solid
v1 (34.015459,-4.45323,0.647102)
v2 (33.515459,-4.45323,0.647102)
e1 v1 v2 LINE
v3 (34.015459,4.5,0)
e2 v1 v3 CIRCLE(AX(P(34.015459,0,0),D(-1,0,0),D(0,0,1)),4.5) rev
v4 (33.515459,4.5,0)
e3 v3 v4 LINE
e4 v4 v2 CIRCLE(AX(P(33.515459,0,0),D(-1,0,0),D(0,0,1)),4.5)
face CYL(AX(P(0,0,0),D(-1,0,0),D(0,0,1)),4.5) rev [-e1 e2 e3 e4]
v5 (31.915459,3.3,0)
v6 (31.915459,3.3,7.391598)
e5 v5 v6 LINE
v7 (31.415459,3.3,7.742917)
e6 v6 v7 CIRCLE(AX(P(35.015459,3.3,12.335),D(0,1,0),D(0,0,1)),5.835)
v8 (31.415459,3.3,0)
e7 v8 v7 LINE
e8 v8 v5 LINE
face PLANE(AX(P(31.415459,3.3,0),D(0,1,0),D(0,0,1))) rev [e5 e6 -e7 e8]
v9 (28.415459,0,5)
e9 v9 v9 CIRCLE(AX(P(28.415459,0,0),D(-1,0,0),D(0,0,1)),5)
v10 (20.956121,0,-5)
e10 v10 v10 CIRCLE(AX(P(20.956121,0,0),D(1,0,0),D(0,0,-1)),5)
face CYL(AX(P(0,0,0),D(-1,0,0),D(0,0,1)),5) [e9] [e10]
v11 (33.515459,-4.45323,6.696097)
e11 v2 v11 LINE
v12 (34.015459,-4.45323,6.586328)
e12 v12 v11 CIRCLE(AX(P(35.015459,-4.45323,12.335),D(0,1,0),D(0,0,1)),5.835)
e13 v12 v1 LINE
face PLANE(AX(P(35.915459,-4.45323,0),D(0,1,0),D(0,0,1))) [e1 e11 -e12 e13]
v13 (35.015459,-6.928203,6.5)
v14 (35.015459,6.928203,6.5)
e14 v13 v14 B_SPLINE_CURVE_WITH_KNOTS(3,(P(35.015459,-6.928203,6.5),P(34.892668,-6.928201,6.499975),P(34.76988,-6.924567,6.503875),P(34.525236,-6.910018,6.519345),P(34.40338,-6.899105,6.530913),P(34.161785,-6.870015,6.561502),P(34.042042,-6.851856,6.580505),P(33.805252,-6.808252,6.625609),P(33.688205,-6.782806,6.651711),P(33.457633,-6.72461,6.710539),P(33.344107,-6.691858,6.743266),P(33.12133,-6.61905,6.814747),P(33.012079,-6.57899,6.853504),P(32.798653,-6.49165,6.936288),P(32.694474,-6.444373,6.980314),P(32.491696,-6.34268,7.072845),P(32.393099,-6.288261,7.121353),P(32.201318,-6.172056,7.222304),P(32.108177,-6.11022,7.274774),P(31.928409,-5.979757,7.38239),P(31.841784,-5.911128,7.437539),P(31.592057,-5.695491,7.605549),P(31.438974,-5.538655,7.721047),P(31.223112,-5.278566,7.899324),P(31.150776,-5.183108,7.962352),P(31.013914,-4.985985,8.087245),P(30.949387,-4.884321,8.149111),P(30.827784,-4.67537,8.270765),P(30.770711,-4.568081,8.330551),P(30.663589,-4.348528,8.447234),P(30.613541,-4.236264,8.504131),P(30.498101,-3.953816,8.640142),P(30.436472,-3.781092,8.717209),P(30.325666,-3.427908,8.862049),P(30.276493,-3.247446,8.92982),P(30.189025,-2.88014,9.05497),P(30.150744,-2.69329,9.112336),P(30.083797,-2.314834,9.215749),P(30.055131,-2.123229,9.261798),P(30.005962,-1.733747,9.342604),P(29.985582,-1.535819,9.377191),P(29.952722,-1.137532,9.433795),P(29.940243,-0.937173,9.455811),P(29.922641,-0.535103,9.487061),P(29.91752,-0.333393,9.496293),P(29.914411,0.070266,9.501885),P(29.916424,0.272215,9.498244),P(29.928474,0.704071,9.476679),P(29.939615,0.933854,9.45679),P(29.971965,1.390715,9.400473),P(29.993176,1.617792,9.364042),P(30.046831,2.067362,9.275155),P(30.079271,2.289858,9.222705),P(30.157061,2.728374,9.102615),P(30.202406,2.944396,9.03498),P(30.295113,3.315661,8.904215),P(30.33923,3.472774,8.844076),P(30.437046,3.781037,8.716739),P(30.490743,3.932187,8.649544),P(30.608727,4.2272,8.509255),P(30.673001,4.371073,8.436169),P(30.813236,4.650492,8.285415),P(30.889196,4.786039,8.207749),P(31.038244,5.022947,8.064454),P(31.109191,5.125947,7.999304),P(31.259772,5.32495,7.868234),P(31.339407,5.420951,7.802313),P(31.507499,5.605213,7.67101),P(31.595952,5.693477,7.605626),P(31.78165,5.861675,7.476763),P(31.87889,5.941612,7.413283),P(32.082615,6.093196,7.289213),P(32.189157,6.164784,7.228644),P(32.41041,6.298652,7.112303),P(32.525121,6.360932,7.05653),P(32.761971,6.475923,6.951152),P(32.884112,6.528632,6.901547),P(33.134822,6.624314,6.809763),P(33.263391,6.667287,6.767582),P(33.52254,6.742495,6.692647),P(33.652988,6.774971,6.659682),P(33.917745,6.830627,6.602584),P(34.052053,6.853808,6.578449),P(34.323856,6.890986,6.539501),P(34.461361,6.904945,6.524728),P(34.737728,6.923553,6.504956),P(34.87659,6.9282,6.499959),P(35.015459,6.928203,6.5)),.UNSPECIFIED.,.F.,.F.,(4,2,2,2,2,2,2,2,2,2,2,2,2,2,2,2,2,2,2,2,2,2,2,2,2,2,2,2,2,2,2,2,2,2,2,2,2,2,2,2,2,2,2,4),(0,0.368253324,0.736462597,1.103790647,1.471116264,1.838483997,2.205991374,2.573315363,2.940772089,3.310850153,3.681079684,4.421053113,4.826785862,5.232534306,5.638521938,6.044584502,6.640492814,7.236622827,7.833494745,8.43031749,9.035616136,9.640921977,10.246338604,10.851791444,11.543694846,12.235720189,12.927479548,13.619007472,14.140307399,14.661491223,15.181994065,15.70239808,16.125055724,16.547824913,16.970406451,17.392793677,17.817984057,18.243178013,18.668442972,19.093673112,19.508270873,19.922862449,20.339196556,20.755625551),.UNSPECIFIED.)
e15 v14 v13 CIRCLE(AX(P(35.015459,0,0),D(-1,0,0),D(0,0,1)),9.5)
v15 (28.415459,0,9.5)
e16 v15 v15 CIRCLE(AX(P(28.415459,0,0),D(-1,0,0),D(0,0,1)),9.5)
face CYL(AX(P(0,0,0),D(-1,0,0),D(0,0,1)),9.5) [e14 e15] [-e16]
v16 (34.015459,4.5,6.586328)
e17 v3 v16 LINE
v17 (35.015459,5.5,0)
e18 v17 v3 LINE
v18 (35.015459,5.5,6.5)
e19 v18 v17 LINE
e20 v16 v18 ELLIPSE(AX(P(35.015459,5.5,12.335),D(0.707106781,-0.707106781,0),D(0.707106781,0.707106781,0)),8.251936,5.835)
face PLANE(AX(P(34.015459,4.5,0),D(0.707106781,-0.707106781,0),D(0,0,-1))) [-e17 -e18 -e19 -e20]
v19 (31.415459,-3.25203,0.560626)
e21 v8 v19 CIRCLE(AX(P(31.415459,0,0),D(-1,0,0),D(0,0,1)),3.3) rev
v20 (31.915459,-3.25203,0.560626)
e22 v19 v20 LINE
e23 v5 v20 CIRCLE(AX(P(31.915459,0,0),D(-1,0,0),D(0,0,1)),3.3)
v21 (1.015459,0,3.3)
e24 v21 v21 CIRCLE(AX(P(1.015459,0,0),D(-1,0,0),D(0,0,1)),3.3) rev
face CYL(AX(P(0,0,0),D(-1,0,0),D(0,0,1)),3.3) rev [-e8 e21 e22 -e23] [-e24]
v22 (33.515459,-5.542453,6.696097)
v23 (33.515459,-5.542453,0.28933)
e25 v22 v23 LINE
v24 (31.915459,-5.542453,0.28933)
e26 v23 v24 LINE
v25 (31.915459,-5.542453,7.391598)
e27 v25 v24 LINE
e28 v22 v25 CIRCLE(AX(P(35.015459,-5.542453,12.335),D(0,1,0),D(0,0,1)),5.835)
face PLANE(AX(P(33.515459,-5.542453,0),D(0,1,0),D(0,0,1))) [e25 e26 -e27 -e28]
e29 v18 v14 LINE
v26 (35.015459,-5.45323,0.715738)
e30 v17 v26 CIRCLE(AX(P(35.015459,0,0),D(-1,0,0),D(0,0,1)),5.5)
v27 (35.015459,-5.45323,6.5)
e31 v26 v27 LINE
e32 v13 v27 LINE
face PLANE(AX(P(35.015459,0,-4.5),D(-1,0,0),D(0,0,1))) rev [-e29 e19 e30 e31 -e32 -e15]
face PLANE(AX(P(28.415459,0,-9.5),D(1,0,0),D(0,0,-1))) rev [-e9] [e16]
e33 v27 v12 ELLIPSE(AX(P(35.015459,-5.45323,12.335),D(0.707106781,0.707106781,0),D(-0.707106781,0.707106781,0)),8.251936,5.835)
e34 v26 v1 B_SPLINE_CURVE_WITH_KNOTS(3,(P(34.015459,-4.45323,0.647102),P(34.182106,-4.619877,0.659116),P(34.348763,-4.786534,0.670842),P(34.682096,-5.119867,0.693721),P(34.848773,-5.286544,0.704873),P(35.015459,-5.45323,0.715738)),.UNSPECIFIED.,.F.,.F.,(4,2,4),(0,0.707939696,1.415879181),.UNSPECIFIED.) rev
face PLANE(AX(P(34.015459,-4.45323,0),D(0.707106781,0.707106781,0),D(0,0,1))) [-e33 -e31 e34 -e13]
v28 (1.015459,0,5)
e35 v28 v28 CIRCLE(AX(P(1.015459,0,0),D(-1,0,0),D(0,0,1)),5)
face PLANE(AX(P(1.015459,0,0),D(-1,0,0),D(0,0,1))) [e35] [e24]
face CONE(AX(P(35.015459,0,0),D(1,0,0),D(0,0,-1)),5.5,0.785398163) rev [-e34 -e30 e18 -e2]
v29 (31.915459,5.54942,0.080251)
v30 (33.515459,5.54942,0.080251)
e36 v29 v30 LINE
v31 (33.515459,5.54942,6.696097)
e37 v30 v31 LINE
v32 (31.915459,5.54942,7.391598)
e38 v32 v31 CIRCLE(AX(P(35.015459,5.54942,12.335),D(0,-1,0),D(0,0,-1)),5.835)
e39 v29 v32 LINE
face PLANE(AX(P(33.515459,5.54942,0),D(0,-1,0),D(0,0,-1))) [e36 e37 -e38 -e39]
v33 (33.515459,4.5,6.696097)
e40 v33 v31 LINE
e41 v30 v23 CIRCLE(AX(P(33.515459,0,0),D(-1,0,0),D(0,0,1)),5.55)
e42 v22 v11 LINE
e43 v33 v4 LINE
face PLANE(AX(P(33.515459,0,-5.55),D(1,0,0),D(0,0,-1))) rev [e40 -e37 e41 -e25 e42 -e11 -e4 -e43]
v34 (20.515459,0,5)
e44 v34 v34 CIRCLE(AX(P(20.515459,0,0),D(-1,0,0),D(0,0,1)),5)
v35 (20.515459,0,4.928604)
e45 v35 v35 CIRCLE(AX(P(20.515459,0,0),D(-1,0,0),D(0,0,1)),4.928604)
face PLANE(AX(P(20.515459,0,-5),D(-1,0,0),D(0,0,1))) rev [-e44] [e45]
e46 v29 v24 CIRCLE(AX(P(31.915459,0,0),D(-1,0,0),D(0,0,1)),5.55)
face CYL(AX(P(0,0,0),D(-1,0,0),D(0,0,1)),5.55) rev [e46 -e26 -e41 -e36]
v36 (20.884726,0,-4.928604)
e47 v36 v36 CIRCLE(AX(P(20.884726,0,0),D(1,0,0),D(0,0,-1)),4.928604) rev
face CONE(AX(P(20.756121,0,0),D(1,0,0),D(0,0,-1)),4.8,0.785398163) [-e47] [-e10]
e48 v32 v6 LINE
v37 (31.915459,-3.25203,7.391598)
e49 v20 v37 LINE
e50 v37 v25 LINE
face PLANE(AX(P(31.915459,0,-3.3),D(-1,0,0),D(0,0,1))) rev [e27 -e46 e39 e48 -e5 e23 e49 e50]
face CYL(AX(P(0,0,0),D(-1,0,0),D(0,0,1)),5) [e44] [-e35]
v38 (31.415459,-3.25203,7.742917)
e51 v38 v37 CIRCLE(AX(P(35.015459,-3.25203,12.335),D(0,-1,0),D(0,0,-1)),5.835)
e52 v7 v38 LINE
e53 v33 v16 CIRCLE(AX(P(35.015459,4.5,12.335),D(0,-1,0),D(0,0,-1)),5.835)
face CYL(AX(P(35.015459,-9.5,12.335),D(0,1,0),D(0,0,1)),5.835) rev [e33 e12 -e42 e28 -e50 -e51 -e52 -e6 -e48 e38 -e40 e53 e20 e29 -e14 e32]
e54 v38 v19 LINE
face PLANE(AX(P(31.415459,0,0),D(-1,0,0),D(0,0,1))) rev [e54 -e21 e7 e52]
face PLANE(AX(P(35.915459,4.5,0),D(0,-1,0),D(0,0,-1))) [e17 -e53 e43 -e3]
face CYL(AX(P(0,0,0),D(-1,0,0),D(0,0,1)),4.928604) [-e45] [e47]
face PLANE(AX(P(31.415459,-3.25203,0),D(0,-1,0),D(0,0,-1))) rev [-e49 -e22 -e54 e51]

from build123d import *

# Parameters (mm, degrees)
CHANFRO3_SIZE              = 0.2
ESBO_O3_W                  = 12.082799142
ESBO_O3_H                  = 11.091873023
CORTE_EXTRUS_O1_DEPTH      = 1.6
ESBO_O4_W                  = 12.202436568
ESBO_O4_H                  = 8.953230152
CORTE_EXTRUS_O2_DEPTH      = 4
ESBO_O11_R                 = 6.241505963
CORTE_EXTRUS_O5_DEPTH      = 1
ESBO_O5_W                  = 9.712143391
ESBO_O5_H                  = 6.552029914
CORTE_EXTRUS_O3_DEPTH      = 0.5
CORTE_EXTRUS_O4_DEPTH      = 38.504431422
CORTE_EXTRUS_O4_DEPTH_BACK = 38.504431422
CHANFRO6_SIZE              = 1


with BuildPart() as part:
    # Esboço1 → Revolução1 (revolve)
    with BuildSketch(Plane(origin=(0, 0, 0), x_dir=(1, 0, 0), z_dir=(0, 1, 0)), mode=Mode.PRIVATE) as revolu_o1_sk:
        Polygon((35.015459104, 4.5), (35.015459104, 9.5), (28.415459104, 9.5), (28.415459104, 5), (20.75612147, 5), (20.75612147, 4.928604204), (20.515459104, 4.928604204), (20.515459104, 5), (0.015459104, 5), (0.015459104, 3.3), (31.915459104, 3.3), (31.915459104, 5.55), (33.515459104, 5.55), (33.515459104, 4.5), align=None)
    revolve(revolu_o1_sk.sketch.rotate(Axis((0, 0, 0), (1, 0, 0)), 180), axis=Axis((0, 0, 0), (1, 0, 0)))

    # Chanfro3
    # the kernel refuses this chamfer: 0.2 mm, written as the material it takes off along each edge
    with BuildSketch(Plane(origin=(20.75612147, 0, 0), x_dir=(0, 0, 1), z_dir=(0, 1, 0))) as chanfro3_piece_1_section:
        Polygon((5, CHANFRO3_SIZE), (5 - CHANFRO3_SIZE, 0), (5, 0), align=None)
    chanfro3_piece_1 = revolve(axis=Axis((20.75612147, 0, 0), (1, 0, 0)), mode=Mode.PRIVATE)
    chanfro3_piece_1 = chanfro3_piece_1 - Plane(origin=(20.918018136, 0, 0), x_dir=(0, 0, 1), z_dir=(-1, 0, 0)) * Cylinder(4.928604204, 21, mode=Mode.PRIVATE)
    add(chanfro3_piece_1, mode=Mode.SUBTRACT)

    # Esboço3 → Corte-extrusão1 (cut)
    with BuildSketch(Plane(origin=(31.915459104, 0, 0), x_dir=(0, 0, -1), z_dir=(1, 0, 0))):
        with Locations((-6.041399571, 0.003483257)):
            Rectangle(ESBO_O3_W, ESBO_O3_H)
    extrude(amount=CORTE_EXTRUS_O1_DEPTH, mode=Mode.SUBTRACT)

    # Esboço4 → Corte-extrusão2 (cut)
    with BuildSketch(Plane(origin=(31.915459104, 0, 0), x_dir=(0, 0, -1), z_dir=(1, 0, 0))):
        with Locations((-6.101218284, 0.023384924)):
            Rectangle(ESBO_O4_W, ESBO_O4_H)
    extrude(amount=CORTE_EXTRUS_O2_DEPTH, mode=Mode.SUBTRACT)

    # Esboço11 → Corte-extrusão5 (cut)
    with BuildSketch(Plane.ZY.offset(-0.015459104)):
        Circle(ESBO_O11_R)
    extrude(amount=-CORTE_EXTRUS_O5_DEPTH, mode=Mode.SUBTRACT)

    # Esboço5 → Corte-extrusão3 (cut)
    with BuildSketch(Plane(origin=(31.915459104, 0, 0), x_dir=(0, 0, -1), z_dir=(1, 0, 0))):
        with Locations((-4.856071696, 0.023985043)):
            Rectangle(ESBO_O5_W, ESBO_O5_H)
    extrude(amount=-CORTE_EXTRUS_O3_DEPTH, mode=Mode.SUBTRACT)

    # Esboço6 → Corte-extrusão4 (cut, two sides: drawn at the far end of the back side and taken through both)
    with BuildSketch(Plane(origin=(0, 0, 0), x_dir=(1, 0, 0), z_dir=(0, 1, 0)).offset(-CORTE_EXTRUS_O4_DEPTH_BACK)):
        with BuildLine():
            ThreePointArc((29.915459104, -9.5), (32.056996665, -7.305613855), (35.015459104, -6.5))
            add(Edge.make_bspline(
                [(29.915459104, -9.5), (30.631864389, -12.277391552), (37.640288769, -12.30241828), (36.765568572, -6.851347348), (35.015459104, -6.5)],
                knots=[0, 0, 0, 0, 0.632855425, 1, 1, 1, 1], degree=3))
        make_face()
    extrude(amount=CORTE_EXTRUS_O4_DEPTH + CORTE_EXTRUS_O4_DEPTH_BACK, mode=Mode.SUBTRACT)

    # Chanfro6
    chanfro6_edges = [part.edges().sort_by_distance(p)[0] for p in [
        (35.015459104, -4.453230152, 3.573551082),
        (35.015459104, 4.5, 3.25),
        (35.015459104, -0.324395064, -4.488292308),
    ]]
    chamfer(chanfro6_edges, length=CHANFRO6_SIZE)


solid = part.part
